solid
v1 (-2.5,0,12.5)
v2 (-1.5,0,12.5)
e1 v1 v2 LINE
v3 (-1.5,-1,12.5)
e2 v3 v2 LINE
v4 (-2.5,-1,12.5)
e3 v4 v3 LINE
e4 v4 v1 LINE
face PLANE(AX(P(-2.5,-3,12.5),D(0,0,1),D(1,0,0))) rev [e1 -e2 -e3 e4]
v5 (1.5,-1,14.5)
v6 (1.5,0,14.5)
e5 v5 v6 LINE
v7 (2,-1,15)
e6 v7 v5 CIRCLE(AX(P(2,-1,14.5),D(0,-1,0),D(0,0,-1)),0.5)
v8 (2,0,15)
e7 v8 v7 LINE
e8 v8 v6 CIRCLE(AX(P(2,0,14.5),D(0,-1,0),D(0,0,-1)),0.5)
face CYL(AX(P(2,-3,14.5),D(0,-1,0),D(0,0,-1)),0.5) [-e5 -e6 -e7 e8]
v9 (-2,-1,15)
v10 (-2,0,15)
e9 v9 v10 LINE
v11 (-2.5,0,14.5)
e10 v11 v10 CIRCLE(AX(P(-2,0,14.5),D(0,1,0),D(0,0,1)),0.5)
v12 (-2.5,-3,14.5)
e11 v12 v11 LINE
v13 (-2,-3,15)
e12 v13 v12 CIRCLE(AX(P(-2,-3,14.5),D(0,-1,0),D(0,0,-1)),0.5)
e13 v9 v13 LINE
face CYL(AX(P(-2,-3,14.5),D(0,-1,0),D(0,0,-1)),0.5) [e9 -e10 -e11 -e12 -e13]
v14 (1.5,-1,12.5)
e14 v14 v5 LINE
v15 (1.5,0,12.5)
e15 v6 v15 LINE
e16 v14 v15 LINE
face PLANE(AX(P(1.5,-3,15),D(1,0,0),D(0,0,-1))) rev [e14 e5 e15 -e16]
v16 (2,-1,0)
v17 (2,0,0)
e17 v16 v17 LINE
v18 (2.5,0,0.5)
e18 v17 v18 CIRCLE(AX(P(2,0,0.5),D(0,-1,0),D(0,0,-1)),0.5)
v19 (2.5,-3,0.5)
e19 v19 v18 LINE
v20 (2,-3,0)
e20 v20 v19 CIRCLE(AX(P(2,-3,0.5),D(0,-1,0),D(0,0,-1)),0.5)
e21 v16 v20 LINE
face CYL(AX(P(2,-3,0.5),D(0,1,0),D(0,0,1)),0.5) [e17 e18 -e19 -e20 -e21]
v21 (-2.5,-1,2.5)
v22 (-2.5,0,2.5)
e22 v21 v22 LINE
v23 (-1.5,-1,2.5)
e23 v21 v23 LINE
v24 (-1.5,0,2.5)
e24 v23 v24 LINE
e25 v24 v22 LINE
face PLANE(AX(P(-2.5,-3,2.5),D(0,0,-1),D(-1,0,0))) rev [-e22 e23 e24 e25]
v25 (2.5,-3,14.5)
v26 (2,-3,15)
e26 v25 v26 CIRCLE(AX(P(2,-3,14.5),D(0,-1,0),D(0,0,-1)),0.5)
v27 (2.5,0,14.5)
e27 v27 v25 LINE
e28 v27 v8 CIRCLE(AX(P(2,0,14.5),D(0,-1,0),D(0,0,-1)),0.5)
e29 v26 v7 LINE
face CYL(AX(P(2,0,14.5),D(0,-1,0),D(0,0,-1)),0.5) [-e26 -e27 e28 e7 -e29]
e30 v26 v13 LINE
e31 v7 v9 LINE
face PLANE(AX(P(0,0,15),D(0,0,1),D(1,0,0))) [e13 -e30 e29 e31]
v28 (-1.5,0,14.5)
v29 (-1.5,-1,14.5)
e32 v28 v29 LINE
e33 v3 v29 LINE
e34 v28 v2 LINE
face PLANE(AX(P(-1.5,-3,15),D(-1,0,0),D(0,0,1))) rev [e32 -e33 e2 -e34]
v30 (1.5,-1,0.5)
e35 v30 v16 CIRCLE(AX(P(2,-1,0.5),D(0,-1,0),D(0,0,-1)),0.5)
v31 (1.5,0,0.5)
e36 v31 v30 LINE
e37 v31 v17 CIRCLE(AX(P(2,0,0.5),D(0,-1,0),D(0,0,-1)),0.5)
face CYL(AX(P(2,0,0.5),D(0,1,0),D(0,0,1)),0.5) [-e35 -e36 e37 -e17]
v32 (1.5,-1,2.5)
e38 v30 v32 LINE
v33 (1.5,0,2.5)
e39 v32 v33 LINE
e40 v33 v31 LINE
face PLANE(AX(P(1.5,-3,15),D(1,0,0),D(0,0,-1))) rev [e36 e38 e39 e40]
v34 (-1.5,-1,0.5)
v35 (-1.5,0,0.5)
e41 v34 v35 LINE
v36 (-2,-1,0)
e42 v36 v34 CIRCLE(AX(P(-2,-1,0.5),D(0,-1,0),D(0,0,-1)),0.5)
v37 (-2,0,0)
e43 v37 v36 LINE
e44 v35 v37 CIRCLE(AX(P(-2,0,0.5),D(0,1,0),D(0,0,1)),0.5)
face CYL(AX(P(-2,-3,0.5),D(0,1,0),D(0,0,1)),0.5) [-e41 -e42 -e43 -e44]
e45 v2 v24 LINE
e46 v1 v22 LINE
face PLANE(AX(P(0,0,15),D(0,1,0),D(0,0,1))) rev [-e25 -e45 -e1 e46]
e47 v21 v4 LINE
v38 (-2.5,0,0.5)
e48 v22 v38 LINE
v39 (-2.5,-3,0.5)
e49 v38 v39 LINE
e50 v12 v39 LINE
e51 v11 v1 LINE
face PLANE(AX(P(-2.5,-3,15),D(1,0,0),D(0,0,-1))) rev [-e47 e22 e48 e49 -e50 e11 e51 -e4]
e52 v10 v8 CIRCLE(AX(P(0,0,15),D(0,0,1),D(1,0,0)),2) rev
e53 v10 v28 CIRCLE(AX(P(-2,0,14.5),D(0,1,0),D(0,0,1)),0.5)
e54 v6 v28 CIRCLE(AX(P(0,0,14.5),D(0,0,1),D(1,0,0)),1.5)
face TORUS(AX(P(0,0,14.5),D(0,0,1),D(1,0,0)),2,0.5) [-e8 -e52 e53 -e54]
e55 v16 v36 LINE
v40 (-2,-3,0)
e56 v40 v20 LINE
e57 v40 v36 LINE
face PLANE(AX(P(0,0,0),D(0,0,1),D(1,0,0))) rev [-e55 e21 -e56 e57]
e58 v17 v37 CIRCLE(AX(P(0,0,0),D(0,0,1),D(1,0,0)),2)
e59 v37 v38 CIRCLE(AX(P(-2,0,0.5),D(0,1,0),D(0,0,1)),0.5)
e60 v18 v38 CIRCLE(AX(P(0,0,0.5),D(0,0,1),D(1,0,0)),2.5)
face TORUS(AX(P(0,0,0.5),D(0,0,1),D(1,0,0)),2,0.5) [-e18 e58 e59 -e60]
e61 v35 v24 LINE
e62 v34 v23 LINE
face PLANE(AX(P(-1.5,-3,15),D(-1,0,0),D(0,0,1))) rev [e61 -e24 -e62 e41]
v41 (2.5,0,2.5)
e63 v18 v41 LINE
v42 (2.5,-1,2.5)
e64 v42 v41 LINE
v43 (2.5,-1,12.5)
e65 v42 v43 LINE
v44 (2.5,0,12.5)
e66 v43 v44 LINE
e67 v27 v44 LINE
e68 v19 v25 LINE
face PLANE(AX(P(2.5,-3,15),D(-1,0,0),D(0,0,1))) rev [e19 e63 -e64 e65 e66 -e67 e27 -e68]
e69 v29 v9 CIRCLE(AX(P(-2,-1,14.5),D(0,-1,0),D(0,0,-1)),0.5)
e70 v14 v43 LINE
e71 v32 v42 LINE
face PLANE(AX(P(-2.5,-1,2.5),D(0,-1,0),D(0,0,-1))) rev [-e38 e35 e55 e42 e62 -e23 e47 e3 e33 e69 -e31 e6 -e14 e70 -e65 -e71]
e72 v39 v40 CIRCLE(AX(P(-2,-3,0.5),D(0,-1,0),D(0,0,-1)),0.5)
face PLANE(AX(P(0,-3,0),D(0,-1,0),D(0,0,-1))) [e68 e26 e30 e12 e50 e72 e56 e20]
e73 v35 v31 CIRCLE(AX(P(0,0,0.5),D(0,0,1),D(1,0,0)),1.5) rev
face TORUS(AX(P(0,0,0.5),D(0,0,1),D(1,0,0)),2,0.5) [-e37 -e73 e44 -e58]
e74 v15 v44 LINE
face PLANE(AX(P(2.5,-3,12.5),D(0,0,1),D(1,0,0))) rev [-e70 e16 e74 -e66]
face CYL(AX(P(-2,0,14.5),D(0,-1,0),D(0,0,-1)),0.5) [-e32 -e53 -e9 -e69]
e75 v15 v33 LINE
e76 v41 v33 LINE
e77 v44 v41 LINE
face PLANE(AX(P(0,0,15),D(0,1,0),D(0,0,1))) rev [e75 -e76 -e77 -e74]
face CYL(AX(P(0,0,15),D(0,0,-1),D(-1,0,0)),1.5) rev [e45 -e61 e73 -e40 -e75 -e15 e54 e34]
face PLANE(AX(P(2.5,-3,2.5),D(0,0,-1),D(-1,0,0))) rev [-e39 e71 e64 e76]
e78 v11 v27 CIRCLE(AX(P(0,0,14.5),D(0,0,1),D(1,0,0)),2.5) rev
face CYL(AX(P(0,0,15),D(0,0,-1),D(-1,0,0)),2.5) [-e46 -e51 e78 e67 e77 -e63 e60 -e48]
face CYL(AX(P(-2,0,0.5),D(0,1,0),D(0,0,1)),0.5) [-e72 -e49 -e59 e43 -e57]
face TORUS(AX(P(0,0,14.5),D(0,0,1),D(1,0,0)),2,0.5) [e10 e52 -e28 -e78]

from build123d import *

# Parameters (mm, degrees)
DODANIE_WYCI_GNI_CIE2_DEPTH = 15
SZKIC3_W                    = 1
SZKIC3_H                    = 2.5
DODANIE_WYCI_GNI_CIE3_DEPTH = 3
SZKIC4_W                    = 1
SZKIC4_H                    = 2
DODANIE_WYCI_GNI_CIE4_DEPTH = 10
SZKIC6_W                    = 15
SZKIC6_H                    = 2
DODANIE_WYCI_GNI_CIE5_DEPTH = 3
ZAOKR_GLENIE1_R             = 0.5


with BuildPart() as part:
    # Szkic1 → Dodanie-wyciągnięcie2 (new body)
    with BuildSketch(Plane.XY):
        with BuildLine():
            ThreePointArc((-2.5, 0), (0, 2.5), (2.5, 0))
            Line((2.5, 0), (1.5, 0))
            ThreePointArc((1.5, 0), (0, 1.5), (-1.5, 0))
            Line((-1.5, 0), (-2.5, 0))
        make_face()
    extrude(amount=DODANIE_WYCI_GNI_CIE2_DEPTH)

    # Szkic3 → Dodanie-wyciągnięcie3 (add)
    with BuildSketch(Plane.XZ):
        with Locations((-2, 13.75)):
            Rectangle(SZKIC3_W, SZKIC3_H)
        with Locations((2, 13.75)):
            Rectangle(SZKIC3_W, SZKIC3_H)
        with Locations((2, 1.25)):
            Rectangle(SZKIC3_W, SZKIC3_H)
        with Locations((-2, 1.25)):
            Rectangle(SZKIC3_W, SZKIC3_H)
    extrude(amount=DODANIE_WYCI_GNI_CIE3_DEPTH)

    # Szkic4 → Dodanie-wyciągnięcie4 (add)
    with BuildSketch(Plane(origin=(0, 0, 12.5), x_dir=(-1, 0, 0), z_dir=(0, 0, -1))):
        with Locations((2, -2)):
            Rectangle(SZKIC4_W, SZKIC4_H)
        with Locations((-2, -2)):
            Rectangle(SZKIC4_W, SZKIC4_H)
    extrude(amount=DODANIE_WYCI_GNI_CIE4_DEPTH)

    # Szkic6 → Dodanie-wyciągnięcie5 (add)
    with BuildSketch(Plane(origin=(-1.5, 0, 0), x_dir=(0, 0, -1), z_dir=(1, 0, 0))):
        with Locations((-7.5, -2)):
            Rectangle(SZKIC6_W, SZKIC6_H)
    extrude(amount=DODANIE_WYCI_GNI_CIE5_DEPTH)

    # Zaokrąglenie1
    zaokr_glenie1_edges = [part.edges().sort_by_distance(p)[0] for p in [
        (0, 1.5, 15),
        (-2.5, -1.5, 15),
        (2.5, -1.5, 15),
        (2.5, -1.5, 0),
        (-2.5, -1.5, 0),
        (0, 2.5, 15),
        (0, 1.5, 0),
        (0, 2.5, 0),
        (1.5, -0.5, 0),
        (1.5, -0.5, 15),
        (-1.5, -0.5, 15),
        (-1.5, -0.5, 0),
    ]]
    fillet(zaokr_glenie1_edges, radius=ZAOKR_GLENIE1_R - 0.0001)  # a hair under: the kernel refuses the full size


solid = part.part
